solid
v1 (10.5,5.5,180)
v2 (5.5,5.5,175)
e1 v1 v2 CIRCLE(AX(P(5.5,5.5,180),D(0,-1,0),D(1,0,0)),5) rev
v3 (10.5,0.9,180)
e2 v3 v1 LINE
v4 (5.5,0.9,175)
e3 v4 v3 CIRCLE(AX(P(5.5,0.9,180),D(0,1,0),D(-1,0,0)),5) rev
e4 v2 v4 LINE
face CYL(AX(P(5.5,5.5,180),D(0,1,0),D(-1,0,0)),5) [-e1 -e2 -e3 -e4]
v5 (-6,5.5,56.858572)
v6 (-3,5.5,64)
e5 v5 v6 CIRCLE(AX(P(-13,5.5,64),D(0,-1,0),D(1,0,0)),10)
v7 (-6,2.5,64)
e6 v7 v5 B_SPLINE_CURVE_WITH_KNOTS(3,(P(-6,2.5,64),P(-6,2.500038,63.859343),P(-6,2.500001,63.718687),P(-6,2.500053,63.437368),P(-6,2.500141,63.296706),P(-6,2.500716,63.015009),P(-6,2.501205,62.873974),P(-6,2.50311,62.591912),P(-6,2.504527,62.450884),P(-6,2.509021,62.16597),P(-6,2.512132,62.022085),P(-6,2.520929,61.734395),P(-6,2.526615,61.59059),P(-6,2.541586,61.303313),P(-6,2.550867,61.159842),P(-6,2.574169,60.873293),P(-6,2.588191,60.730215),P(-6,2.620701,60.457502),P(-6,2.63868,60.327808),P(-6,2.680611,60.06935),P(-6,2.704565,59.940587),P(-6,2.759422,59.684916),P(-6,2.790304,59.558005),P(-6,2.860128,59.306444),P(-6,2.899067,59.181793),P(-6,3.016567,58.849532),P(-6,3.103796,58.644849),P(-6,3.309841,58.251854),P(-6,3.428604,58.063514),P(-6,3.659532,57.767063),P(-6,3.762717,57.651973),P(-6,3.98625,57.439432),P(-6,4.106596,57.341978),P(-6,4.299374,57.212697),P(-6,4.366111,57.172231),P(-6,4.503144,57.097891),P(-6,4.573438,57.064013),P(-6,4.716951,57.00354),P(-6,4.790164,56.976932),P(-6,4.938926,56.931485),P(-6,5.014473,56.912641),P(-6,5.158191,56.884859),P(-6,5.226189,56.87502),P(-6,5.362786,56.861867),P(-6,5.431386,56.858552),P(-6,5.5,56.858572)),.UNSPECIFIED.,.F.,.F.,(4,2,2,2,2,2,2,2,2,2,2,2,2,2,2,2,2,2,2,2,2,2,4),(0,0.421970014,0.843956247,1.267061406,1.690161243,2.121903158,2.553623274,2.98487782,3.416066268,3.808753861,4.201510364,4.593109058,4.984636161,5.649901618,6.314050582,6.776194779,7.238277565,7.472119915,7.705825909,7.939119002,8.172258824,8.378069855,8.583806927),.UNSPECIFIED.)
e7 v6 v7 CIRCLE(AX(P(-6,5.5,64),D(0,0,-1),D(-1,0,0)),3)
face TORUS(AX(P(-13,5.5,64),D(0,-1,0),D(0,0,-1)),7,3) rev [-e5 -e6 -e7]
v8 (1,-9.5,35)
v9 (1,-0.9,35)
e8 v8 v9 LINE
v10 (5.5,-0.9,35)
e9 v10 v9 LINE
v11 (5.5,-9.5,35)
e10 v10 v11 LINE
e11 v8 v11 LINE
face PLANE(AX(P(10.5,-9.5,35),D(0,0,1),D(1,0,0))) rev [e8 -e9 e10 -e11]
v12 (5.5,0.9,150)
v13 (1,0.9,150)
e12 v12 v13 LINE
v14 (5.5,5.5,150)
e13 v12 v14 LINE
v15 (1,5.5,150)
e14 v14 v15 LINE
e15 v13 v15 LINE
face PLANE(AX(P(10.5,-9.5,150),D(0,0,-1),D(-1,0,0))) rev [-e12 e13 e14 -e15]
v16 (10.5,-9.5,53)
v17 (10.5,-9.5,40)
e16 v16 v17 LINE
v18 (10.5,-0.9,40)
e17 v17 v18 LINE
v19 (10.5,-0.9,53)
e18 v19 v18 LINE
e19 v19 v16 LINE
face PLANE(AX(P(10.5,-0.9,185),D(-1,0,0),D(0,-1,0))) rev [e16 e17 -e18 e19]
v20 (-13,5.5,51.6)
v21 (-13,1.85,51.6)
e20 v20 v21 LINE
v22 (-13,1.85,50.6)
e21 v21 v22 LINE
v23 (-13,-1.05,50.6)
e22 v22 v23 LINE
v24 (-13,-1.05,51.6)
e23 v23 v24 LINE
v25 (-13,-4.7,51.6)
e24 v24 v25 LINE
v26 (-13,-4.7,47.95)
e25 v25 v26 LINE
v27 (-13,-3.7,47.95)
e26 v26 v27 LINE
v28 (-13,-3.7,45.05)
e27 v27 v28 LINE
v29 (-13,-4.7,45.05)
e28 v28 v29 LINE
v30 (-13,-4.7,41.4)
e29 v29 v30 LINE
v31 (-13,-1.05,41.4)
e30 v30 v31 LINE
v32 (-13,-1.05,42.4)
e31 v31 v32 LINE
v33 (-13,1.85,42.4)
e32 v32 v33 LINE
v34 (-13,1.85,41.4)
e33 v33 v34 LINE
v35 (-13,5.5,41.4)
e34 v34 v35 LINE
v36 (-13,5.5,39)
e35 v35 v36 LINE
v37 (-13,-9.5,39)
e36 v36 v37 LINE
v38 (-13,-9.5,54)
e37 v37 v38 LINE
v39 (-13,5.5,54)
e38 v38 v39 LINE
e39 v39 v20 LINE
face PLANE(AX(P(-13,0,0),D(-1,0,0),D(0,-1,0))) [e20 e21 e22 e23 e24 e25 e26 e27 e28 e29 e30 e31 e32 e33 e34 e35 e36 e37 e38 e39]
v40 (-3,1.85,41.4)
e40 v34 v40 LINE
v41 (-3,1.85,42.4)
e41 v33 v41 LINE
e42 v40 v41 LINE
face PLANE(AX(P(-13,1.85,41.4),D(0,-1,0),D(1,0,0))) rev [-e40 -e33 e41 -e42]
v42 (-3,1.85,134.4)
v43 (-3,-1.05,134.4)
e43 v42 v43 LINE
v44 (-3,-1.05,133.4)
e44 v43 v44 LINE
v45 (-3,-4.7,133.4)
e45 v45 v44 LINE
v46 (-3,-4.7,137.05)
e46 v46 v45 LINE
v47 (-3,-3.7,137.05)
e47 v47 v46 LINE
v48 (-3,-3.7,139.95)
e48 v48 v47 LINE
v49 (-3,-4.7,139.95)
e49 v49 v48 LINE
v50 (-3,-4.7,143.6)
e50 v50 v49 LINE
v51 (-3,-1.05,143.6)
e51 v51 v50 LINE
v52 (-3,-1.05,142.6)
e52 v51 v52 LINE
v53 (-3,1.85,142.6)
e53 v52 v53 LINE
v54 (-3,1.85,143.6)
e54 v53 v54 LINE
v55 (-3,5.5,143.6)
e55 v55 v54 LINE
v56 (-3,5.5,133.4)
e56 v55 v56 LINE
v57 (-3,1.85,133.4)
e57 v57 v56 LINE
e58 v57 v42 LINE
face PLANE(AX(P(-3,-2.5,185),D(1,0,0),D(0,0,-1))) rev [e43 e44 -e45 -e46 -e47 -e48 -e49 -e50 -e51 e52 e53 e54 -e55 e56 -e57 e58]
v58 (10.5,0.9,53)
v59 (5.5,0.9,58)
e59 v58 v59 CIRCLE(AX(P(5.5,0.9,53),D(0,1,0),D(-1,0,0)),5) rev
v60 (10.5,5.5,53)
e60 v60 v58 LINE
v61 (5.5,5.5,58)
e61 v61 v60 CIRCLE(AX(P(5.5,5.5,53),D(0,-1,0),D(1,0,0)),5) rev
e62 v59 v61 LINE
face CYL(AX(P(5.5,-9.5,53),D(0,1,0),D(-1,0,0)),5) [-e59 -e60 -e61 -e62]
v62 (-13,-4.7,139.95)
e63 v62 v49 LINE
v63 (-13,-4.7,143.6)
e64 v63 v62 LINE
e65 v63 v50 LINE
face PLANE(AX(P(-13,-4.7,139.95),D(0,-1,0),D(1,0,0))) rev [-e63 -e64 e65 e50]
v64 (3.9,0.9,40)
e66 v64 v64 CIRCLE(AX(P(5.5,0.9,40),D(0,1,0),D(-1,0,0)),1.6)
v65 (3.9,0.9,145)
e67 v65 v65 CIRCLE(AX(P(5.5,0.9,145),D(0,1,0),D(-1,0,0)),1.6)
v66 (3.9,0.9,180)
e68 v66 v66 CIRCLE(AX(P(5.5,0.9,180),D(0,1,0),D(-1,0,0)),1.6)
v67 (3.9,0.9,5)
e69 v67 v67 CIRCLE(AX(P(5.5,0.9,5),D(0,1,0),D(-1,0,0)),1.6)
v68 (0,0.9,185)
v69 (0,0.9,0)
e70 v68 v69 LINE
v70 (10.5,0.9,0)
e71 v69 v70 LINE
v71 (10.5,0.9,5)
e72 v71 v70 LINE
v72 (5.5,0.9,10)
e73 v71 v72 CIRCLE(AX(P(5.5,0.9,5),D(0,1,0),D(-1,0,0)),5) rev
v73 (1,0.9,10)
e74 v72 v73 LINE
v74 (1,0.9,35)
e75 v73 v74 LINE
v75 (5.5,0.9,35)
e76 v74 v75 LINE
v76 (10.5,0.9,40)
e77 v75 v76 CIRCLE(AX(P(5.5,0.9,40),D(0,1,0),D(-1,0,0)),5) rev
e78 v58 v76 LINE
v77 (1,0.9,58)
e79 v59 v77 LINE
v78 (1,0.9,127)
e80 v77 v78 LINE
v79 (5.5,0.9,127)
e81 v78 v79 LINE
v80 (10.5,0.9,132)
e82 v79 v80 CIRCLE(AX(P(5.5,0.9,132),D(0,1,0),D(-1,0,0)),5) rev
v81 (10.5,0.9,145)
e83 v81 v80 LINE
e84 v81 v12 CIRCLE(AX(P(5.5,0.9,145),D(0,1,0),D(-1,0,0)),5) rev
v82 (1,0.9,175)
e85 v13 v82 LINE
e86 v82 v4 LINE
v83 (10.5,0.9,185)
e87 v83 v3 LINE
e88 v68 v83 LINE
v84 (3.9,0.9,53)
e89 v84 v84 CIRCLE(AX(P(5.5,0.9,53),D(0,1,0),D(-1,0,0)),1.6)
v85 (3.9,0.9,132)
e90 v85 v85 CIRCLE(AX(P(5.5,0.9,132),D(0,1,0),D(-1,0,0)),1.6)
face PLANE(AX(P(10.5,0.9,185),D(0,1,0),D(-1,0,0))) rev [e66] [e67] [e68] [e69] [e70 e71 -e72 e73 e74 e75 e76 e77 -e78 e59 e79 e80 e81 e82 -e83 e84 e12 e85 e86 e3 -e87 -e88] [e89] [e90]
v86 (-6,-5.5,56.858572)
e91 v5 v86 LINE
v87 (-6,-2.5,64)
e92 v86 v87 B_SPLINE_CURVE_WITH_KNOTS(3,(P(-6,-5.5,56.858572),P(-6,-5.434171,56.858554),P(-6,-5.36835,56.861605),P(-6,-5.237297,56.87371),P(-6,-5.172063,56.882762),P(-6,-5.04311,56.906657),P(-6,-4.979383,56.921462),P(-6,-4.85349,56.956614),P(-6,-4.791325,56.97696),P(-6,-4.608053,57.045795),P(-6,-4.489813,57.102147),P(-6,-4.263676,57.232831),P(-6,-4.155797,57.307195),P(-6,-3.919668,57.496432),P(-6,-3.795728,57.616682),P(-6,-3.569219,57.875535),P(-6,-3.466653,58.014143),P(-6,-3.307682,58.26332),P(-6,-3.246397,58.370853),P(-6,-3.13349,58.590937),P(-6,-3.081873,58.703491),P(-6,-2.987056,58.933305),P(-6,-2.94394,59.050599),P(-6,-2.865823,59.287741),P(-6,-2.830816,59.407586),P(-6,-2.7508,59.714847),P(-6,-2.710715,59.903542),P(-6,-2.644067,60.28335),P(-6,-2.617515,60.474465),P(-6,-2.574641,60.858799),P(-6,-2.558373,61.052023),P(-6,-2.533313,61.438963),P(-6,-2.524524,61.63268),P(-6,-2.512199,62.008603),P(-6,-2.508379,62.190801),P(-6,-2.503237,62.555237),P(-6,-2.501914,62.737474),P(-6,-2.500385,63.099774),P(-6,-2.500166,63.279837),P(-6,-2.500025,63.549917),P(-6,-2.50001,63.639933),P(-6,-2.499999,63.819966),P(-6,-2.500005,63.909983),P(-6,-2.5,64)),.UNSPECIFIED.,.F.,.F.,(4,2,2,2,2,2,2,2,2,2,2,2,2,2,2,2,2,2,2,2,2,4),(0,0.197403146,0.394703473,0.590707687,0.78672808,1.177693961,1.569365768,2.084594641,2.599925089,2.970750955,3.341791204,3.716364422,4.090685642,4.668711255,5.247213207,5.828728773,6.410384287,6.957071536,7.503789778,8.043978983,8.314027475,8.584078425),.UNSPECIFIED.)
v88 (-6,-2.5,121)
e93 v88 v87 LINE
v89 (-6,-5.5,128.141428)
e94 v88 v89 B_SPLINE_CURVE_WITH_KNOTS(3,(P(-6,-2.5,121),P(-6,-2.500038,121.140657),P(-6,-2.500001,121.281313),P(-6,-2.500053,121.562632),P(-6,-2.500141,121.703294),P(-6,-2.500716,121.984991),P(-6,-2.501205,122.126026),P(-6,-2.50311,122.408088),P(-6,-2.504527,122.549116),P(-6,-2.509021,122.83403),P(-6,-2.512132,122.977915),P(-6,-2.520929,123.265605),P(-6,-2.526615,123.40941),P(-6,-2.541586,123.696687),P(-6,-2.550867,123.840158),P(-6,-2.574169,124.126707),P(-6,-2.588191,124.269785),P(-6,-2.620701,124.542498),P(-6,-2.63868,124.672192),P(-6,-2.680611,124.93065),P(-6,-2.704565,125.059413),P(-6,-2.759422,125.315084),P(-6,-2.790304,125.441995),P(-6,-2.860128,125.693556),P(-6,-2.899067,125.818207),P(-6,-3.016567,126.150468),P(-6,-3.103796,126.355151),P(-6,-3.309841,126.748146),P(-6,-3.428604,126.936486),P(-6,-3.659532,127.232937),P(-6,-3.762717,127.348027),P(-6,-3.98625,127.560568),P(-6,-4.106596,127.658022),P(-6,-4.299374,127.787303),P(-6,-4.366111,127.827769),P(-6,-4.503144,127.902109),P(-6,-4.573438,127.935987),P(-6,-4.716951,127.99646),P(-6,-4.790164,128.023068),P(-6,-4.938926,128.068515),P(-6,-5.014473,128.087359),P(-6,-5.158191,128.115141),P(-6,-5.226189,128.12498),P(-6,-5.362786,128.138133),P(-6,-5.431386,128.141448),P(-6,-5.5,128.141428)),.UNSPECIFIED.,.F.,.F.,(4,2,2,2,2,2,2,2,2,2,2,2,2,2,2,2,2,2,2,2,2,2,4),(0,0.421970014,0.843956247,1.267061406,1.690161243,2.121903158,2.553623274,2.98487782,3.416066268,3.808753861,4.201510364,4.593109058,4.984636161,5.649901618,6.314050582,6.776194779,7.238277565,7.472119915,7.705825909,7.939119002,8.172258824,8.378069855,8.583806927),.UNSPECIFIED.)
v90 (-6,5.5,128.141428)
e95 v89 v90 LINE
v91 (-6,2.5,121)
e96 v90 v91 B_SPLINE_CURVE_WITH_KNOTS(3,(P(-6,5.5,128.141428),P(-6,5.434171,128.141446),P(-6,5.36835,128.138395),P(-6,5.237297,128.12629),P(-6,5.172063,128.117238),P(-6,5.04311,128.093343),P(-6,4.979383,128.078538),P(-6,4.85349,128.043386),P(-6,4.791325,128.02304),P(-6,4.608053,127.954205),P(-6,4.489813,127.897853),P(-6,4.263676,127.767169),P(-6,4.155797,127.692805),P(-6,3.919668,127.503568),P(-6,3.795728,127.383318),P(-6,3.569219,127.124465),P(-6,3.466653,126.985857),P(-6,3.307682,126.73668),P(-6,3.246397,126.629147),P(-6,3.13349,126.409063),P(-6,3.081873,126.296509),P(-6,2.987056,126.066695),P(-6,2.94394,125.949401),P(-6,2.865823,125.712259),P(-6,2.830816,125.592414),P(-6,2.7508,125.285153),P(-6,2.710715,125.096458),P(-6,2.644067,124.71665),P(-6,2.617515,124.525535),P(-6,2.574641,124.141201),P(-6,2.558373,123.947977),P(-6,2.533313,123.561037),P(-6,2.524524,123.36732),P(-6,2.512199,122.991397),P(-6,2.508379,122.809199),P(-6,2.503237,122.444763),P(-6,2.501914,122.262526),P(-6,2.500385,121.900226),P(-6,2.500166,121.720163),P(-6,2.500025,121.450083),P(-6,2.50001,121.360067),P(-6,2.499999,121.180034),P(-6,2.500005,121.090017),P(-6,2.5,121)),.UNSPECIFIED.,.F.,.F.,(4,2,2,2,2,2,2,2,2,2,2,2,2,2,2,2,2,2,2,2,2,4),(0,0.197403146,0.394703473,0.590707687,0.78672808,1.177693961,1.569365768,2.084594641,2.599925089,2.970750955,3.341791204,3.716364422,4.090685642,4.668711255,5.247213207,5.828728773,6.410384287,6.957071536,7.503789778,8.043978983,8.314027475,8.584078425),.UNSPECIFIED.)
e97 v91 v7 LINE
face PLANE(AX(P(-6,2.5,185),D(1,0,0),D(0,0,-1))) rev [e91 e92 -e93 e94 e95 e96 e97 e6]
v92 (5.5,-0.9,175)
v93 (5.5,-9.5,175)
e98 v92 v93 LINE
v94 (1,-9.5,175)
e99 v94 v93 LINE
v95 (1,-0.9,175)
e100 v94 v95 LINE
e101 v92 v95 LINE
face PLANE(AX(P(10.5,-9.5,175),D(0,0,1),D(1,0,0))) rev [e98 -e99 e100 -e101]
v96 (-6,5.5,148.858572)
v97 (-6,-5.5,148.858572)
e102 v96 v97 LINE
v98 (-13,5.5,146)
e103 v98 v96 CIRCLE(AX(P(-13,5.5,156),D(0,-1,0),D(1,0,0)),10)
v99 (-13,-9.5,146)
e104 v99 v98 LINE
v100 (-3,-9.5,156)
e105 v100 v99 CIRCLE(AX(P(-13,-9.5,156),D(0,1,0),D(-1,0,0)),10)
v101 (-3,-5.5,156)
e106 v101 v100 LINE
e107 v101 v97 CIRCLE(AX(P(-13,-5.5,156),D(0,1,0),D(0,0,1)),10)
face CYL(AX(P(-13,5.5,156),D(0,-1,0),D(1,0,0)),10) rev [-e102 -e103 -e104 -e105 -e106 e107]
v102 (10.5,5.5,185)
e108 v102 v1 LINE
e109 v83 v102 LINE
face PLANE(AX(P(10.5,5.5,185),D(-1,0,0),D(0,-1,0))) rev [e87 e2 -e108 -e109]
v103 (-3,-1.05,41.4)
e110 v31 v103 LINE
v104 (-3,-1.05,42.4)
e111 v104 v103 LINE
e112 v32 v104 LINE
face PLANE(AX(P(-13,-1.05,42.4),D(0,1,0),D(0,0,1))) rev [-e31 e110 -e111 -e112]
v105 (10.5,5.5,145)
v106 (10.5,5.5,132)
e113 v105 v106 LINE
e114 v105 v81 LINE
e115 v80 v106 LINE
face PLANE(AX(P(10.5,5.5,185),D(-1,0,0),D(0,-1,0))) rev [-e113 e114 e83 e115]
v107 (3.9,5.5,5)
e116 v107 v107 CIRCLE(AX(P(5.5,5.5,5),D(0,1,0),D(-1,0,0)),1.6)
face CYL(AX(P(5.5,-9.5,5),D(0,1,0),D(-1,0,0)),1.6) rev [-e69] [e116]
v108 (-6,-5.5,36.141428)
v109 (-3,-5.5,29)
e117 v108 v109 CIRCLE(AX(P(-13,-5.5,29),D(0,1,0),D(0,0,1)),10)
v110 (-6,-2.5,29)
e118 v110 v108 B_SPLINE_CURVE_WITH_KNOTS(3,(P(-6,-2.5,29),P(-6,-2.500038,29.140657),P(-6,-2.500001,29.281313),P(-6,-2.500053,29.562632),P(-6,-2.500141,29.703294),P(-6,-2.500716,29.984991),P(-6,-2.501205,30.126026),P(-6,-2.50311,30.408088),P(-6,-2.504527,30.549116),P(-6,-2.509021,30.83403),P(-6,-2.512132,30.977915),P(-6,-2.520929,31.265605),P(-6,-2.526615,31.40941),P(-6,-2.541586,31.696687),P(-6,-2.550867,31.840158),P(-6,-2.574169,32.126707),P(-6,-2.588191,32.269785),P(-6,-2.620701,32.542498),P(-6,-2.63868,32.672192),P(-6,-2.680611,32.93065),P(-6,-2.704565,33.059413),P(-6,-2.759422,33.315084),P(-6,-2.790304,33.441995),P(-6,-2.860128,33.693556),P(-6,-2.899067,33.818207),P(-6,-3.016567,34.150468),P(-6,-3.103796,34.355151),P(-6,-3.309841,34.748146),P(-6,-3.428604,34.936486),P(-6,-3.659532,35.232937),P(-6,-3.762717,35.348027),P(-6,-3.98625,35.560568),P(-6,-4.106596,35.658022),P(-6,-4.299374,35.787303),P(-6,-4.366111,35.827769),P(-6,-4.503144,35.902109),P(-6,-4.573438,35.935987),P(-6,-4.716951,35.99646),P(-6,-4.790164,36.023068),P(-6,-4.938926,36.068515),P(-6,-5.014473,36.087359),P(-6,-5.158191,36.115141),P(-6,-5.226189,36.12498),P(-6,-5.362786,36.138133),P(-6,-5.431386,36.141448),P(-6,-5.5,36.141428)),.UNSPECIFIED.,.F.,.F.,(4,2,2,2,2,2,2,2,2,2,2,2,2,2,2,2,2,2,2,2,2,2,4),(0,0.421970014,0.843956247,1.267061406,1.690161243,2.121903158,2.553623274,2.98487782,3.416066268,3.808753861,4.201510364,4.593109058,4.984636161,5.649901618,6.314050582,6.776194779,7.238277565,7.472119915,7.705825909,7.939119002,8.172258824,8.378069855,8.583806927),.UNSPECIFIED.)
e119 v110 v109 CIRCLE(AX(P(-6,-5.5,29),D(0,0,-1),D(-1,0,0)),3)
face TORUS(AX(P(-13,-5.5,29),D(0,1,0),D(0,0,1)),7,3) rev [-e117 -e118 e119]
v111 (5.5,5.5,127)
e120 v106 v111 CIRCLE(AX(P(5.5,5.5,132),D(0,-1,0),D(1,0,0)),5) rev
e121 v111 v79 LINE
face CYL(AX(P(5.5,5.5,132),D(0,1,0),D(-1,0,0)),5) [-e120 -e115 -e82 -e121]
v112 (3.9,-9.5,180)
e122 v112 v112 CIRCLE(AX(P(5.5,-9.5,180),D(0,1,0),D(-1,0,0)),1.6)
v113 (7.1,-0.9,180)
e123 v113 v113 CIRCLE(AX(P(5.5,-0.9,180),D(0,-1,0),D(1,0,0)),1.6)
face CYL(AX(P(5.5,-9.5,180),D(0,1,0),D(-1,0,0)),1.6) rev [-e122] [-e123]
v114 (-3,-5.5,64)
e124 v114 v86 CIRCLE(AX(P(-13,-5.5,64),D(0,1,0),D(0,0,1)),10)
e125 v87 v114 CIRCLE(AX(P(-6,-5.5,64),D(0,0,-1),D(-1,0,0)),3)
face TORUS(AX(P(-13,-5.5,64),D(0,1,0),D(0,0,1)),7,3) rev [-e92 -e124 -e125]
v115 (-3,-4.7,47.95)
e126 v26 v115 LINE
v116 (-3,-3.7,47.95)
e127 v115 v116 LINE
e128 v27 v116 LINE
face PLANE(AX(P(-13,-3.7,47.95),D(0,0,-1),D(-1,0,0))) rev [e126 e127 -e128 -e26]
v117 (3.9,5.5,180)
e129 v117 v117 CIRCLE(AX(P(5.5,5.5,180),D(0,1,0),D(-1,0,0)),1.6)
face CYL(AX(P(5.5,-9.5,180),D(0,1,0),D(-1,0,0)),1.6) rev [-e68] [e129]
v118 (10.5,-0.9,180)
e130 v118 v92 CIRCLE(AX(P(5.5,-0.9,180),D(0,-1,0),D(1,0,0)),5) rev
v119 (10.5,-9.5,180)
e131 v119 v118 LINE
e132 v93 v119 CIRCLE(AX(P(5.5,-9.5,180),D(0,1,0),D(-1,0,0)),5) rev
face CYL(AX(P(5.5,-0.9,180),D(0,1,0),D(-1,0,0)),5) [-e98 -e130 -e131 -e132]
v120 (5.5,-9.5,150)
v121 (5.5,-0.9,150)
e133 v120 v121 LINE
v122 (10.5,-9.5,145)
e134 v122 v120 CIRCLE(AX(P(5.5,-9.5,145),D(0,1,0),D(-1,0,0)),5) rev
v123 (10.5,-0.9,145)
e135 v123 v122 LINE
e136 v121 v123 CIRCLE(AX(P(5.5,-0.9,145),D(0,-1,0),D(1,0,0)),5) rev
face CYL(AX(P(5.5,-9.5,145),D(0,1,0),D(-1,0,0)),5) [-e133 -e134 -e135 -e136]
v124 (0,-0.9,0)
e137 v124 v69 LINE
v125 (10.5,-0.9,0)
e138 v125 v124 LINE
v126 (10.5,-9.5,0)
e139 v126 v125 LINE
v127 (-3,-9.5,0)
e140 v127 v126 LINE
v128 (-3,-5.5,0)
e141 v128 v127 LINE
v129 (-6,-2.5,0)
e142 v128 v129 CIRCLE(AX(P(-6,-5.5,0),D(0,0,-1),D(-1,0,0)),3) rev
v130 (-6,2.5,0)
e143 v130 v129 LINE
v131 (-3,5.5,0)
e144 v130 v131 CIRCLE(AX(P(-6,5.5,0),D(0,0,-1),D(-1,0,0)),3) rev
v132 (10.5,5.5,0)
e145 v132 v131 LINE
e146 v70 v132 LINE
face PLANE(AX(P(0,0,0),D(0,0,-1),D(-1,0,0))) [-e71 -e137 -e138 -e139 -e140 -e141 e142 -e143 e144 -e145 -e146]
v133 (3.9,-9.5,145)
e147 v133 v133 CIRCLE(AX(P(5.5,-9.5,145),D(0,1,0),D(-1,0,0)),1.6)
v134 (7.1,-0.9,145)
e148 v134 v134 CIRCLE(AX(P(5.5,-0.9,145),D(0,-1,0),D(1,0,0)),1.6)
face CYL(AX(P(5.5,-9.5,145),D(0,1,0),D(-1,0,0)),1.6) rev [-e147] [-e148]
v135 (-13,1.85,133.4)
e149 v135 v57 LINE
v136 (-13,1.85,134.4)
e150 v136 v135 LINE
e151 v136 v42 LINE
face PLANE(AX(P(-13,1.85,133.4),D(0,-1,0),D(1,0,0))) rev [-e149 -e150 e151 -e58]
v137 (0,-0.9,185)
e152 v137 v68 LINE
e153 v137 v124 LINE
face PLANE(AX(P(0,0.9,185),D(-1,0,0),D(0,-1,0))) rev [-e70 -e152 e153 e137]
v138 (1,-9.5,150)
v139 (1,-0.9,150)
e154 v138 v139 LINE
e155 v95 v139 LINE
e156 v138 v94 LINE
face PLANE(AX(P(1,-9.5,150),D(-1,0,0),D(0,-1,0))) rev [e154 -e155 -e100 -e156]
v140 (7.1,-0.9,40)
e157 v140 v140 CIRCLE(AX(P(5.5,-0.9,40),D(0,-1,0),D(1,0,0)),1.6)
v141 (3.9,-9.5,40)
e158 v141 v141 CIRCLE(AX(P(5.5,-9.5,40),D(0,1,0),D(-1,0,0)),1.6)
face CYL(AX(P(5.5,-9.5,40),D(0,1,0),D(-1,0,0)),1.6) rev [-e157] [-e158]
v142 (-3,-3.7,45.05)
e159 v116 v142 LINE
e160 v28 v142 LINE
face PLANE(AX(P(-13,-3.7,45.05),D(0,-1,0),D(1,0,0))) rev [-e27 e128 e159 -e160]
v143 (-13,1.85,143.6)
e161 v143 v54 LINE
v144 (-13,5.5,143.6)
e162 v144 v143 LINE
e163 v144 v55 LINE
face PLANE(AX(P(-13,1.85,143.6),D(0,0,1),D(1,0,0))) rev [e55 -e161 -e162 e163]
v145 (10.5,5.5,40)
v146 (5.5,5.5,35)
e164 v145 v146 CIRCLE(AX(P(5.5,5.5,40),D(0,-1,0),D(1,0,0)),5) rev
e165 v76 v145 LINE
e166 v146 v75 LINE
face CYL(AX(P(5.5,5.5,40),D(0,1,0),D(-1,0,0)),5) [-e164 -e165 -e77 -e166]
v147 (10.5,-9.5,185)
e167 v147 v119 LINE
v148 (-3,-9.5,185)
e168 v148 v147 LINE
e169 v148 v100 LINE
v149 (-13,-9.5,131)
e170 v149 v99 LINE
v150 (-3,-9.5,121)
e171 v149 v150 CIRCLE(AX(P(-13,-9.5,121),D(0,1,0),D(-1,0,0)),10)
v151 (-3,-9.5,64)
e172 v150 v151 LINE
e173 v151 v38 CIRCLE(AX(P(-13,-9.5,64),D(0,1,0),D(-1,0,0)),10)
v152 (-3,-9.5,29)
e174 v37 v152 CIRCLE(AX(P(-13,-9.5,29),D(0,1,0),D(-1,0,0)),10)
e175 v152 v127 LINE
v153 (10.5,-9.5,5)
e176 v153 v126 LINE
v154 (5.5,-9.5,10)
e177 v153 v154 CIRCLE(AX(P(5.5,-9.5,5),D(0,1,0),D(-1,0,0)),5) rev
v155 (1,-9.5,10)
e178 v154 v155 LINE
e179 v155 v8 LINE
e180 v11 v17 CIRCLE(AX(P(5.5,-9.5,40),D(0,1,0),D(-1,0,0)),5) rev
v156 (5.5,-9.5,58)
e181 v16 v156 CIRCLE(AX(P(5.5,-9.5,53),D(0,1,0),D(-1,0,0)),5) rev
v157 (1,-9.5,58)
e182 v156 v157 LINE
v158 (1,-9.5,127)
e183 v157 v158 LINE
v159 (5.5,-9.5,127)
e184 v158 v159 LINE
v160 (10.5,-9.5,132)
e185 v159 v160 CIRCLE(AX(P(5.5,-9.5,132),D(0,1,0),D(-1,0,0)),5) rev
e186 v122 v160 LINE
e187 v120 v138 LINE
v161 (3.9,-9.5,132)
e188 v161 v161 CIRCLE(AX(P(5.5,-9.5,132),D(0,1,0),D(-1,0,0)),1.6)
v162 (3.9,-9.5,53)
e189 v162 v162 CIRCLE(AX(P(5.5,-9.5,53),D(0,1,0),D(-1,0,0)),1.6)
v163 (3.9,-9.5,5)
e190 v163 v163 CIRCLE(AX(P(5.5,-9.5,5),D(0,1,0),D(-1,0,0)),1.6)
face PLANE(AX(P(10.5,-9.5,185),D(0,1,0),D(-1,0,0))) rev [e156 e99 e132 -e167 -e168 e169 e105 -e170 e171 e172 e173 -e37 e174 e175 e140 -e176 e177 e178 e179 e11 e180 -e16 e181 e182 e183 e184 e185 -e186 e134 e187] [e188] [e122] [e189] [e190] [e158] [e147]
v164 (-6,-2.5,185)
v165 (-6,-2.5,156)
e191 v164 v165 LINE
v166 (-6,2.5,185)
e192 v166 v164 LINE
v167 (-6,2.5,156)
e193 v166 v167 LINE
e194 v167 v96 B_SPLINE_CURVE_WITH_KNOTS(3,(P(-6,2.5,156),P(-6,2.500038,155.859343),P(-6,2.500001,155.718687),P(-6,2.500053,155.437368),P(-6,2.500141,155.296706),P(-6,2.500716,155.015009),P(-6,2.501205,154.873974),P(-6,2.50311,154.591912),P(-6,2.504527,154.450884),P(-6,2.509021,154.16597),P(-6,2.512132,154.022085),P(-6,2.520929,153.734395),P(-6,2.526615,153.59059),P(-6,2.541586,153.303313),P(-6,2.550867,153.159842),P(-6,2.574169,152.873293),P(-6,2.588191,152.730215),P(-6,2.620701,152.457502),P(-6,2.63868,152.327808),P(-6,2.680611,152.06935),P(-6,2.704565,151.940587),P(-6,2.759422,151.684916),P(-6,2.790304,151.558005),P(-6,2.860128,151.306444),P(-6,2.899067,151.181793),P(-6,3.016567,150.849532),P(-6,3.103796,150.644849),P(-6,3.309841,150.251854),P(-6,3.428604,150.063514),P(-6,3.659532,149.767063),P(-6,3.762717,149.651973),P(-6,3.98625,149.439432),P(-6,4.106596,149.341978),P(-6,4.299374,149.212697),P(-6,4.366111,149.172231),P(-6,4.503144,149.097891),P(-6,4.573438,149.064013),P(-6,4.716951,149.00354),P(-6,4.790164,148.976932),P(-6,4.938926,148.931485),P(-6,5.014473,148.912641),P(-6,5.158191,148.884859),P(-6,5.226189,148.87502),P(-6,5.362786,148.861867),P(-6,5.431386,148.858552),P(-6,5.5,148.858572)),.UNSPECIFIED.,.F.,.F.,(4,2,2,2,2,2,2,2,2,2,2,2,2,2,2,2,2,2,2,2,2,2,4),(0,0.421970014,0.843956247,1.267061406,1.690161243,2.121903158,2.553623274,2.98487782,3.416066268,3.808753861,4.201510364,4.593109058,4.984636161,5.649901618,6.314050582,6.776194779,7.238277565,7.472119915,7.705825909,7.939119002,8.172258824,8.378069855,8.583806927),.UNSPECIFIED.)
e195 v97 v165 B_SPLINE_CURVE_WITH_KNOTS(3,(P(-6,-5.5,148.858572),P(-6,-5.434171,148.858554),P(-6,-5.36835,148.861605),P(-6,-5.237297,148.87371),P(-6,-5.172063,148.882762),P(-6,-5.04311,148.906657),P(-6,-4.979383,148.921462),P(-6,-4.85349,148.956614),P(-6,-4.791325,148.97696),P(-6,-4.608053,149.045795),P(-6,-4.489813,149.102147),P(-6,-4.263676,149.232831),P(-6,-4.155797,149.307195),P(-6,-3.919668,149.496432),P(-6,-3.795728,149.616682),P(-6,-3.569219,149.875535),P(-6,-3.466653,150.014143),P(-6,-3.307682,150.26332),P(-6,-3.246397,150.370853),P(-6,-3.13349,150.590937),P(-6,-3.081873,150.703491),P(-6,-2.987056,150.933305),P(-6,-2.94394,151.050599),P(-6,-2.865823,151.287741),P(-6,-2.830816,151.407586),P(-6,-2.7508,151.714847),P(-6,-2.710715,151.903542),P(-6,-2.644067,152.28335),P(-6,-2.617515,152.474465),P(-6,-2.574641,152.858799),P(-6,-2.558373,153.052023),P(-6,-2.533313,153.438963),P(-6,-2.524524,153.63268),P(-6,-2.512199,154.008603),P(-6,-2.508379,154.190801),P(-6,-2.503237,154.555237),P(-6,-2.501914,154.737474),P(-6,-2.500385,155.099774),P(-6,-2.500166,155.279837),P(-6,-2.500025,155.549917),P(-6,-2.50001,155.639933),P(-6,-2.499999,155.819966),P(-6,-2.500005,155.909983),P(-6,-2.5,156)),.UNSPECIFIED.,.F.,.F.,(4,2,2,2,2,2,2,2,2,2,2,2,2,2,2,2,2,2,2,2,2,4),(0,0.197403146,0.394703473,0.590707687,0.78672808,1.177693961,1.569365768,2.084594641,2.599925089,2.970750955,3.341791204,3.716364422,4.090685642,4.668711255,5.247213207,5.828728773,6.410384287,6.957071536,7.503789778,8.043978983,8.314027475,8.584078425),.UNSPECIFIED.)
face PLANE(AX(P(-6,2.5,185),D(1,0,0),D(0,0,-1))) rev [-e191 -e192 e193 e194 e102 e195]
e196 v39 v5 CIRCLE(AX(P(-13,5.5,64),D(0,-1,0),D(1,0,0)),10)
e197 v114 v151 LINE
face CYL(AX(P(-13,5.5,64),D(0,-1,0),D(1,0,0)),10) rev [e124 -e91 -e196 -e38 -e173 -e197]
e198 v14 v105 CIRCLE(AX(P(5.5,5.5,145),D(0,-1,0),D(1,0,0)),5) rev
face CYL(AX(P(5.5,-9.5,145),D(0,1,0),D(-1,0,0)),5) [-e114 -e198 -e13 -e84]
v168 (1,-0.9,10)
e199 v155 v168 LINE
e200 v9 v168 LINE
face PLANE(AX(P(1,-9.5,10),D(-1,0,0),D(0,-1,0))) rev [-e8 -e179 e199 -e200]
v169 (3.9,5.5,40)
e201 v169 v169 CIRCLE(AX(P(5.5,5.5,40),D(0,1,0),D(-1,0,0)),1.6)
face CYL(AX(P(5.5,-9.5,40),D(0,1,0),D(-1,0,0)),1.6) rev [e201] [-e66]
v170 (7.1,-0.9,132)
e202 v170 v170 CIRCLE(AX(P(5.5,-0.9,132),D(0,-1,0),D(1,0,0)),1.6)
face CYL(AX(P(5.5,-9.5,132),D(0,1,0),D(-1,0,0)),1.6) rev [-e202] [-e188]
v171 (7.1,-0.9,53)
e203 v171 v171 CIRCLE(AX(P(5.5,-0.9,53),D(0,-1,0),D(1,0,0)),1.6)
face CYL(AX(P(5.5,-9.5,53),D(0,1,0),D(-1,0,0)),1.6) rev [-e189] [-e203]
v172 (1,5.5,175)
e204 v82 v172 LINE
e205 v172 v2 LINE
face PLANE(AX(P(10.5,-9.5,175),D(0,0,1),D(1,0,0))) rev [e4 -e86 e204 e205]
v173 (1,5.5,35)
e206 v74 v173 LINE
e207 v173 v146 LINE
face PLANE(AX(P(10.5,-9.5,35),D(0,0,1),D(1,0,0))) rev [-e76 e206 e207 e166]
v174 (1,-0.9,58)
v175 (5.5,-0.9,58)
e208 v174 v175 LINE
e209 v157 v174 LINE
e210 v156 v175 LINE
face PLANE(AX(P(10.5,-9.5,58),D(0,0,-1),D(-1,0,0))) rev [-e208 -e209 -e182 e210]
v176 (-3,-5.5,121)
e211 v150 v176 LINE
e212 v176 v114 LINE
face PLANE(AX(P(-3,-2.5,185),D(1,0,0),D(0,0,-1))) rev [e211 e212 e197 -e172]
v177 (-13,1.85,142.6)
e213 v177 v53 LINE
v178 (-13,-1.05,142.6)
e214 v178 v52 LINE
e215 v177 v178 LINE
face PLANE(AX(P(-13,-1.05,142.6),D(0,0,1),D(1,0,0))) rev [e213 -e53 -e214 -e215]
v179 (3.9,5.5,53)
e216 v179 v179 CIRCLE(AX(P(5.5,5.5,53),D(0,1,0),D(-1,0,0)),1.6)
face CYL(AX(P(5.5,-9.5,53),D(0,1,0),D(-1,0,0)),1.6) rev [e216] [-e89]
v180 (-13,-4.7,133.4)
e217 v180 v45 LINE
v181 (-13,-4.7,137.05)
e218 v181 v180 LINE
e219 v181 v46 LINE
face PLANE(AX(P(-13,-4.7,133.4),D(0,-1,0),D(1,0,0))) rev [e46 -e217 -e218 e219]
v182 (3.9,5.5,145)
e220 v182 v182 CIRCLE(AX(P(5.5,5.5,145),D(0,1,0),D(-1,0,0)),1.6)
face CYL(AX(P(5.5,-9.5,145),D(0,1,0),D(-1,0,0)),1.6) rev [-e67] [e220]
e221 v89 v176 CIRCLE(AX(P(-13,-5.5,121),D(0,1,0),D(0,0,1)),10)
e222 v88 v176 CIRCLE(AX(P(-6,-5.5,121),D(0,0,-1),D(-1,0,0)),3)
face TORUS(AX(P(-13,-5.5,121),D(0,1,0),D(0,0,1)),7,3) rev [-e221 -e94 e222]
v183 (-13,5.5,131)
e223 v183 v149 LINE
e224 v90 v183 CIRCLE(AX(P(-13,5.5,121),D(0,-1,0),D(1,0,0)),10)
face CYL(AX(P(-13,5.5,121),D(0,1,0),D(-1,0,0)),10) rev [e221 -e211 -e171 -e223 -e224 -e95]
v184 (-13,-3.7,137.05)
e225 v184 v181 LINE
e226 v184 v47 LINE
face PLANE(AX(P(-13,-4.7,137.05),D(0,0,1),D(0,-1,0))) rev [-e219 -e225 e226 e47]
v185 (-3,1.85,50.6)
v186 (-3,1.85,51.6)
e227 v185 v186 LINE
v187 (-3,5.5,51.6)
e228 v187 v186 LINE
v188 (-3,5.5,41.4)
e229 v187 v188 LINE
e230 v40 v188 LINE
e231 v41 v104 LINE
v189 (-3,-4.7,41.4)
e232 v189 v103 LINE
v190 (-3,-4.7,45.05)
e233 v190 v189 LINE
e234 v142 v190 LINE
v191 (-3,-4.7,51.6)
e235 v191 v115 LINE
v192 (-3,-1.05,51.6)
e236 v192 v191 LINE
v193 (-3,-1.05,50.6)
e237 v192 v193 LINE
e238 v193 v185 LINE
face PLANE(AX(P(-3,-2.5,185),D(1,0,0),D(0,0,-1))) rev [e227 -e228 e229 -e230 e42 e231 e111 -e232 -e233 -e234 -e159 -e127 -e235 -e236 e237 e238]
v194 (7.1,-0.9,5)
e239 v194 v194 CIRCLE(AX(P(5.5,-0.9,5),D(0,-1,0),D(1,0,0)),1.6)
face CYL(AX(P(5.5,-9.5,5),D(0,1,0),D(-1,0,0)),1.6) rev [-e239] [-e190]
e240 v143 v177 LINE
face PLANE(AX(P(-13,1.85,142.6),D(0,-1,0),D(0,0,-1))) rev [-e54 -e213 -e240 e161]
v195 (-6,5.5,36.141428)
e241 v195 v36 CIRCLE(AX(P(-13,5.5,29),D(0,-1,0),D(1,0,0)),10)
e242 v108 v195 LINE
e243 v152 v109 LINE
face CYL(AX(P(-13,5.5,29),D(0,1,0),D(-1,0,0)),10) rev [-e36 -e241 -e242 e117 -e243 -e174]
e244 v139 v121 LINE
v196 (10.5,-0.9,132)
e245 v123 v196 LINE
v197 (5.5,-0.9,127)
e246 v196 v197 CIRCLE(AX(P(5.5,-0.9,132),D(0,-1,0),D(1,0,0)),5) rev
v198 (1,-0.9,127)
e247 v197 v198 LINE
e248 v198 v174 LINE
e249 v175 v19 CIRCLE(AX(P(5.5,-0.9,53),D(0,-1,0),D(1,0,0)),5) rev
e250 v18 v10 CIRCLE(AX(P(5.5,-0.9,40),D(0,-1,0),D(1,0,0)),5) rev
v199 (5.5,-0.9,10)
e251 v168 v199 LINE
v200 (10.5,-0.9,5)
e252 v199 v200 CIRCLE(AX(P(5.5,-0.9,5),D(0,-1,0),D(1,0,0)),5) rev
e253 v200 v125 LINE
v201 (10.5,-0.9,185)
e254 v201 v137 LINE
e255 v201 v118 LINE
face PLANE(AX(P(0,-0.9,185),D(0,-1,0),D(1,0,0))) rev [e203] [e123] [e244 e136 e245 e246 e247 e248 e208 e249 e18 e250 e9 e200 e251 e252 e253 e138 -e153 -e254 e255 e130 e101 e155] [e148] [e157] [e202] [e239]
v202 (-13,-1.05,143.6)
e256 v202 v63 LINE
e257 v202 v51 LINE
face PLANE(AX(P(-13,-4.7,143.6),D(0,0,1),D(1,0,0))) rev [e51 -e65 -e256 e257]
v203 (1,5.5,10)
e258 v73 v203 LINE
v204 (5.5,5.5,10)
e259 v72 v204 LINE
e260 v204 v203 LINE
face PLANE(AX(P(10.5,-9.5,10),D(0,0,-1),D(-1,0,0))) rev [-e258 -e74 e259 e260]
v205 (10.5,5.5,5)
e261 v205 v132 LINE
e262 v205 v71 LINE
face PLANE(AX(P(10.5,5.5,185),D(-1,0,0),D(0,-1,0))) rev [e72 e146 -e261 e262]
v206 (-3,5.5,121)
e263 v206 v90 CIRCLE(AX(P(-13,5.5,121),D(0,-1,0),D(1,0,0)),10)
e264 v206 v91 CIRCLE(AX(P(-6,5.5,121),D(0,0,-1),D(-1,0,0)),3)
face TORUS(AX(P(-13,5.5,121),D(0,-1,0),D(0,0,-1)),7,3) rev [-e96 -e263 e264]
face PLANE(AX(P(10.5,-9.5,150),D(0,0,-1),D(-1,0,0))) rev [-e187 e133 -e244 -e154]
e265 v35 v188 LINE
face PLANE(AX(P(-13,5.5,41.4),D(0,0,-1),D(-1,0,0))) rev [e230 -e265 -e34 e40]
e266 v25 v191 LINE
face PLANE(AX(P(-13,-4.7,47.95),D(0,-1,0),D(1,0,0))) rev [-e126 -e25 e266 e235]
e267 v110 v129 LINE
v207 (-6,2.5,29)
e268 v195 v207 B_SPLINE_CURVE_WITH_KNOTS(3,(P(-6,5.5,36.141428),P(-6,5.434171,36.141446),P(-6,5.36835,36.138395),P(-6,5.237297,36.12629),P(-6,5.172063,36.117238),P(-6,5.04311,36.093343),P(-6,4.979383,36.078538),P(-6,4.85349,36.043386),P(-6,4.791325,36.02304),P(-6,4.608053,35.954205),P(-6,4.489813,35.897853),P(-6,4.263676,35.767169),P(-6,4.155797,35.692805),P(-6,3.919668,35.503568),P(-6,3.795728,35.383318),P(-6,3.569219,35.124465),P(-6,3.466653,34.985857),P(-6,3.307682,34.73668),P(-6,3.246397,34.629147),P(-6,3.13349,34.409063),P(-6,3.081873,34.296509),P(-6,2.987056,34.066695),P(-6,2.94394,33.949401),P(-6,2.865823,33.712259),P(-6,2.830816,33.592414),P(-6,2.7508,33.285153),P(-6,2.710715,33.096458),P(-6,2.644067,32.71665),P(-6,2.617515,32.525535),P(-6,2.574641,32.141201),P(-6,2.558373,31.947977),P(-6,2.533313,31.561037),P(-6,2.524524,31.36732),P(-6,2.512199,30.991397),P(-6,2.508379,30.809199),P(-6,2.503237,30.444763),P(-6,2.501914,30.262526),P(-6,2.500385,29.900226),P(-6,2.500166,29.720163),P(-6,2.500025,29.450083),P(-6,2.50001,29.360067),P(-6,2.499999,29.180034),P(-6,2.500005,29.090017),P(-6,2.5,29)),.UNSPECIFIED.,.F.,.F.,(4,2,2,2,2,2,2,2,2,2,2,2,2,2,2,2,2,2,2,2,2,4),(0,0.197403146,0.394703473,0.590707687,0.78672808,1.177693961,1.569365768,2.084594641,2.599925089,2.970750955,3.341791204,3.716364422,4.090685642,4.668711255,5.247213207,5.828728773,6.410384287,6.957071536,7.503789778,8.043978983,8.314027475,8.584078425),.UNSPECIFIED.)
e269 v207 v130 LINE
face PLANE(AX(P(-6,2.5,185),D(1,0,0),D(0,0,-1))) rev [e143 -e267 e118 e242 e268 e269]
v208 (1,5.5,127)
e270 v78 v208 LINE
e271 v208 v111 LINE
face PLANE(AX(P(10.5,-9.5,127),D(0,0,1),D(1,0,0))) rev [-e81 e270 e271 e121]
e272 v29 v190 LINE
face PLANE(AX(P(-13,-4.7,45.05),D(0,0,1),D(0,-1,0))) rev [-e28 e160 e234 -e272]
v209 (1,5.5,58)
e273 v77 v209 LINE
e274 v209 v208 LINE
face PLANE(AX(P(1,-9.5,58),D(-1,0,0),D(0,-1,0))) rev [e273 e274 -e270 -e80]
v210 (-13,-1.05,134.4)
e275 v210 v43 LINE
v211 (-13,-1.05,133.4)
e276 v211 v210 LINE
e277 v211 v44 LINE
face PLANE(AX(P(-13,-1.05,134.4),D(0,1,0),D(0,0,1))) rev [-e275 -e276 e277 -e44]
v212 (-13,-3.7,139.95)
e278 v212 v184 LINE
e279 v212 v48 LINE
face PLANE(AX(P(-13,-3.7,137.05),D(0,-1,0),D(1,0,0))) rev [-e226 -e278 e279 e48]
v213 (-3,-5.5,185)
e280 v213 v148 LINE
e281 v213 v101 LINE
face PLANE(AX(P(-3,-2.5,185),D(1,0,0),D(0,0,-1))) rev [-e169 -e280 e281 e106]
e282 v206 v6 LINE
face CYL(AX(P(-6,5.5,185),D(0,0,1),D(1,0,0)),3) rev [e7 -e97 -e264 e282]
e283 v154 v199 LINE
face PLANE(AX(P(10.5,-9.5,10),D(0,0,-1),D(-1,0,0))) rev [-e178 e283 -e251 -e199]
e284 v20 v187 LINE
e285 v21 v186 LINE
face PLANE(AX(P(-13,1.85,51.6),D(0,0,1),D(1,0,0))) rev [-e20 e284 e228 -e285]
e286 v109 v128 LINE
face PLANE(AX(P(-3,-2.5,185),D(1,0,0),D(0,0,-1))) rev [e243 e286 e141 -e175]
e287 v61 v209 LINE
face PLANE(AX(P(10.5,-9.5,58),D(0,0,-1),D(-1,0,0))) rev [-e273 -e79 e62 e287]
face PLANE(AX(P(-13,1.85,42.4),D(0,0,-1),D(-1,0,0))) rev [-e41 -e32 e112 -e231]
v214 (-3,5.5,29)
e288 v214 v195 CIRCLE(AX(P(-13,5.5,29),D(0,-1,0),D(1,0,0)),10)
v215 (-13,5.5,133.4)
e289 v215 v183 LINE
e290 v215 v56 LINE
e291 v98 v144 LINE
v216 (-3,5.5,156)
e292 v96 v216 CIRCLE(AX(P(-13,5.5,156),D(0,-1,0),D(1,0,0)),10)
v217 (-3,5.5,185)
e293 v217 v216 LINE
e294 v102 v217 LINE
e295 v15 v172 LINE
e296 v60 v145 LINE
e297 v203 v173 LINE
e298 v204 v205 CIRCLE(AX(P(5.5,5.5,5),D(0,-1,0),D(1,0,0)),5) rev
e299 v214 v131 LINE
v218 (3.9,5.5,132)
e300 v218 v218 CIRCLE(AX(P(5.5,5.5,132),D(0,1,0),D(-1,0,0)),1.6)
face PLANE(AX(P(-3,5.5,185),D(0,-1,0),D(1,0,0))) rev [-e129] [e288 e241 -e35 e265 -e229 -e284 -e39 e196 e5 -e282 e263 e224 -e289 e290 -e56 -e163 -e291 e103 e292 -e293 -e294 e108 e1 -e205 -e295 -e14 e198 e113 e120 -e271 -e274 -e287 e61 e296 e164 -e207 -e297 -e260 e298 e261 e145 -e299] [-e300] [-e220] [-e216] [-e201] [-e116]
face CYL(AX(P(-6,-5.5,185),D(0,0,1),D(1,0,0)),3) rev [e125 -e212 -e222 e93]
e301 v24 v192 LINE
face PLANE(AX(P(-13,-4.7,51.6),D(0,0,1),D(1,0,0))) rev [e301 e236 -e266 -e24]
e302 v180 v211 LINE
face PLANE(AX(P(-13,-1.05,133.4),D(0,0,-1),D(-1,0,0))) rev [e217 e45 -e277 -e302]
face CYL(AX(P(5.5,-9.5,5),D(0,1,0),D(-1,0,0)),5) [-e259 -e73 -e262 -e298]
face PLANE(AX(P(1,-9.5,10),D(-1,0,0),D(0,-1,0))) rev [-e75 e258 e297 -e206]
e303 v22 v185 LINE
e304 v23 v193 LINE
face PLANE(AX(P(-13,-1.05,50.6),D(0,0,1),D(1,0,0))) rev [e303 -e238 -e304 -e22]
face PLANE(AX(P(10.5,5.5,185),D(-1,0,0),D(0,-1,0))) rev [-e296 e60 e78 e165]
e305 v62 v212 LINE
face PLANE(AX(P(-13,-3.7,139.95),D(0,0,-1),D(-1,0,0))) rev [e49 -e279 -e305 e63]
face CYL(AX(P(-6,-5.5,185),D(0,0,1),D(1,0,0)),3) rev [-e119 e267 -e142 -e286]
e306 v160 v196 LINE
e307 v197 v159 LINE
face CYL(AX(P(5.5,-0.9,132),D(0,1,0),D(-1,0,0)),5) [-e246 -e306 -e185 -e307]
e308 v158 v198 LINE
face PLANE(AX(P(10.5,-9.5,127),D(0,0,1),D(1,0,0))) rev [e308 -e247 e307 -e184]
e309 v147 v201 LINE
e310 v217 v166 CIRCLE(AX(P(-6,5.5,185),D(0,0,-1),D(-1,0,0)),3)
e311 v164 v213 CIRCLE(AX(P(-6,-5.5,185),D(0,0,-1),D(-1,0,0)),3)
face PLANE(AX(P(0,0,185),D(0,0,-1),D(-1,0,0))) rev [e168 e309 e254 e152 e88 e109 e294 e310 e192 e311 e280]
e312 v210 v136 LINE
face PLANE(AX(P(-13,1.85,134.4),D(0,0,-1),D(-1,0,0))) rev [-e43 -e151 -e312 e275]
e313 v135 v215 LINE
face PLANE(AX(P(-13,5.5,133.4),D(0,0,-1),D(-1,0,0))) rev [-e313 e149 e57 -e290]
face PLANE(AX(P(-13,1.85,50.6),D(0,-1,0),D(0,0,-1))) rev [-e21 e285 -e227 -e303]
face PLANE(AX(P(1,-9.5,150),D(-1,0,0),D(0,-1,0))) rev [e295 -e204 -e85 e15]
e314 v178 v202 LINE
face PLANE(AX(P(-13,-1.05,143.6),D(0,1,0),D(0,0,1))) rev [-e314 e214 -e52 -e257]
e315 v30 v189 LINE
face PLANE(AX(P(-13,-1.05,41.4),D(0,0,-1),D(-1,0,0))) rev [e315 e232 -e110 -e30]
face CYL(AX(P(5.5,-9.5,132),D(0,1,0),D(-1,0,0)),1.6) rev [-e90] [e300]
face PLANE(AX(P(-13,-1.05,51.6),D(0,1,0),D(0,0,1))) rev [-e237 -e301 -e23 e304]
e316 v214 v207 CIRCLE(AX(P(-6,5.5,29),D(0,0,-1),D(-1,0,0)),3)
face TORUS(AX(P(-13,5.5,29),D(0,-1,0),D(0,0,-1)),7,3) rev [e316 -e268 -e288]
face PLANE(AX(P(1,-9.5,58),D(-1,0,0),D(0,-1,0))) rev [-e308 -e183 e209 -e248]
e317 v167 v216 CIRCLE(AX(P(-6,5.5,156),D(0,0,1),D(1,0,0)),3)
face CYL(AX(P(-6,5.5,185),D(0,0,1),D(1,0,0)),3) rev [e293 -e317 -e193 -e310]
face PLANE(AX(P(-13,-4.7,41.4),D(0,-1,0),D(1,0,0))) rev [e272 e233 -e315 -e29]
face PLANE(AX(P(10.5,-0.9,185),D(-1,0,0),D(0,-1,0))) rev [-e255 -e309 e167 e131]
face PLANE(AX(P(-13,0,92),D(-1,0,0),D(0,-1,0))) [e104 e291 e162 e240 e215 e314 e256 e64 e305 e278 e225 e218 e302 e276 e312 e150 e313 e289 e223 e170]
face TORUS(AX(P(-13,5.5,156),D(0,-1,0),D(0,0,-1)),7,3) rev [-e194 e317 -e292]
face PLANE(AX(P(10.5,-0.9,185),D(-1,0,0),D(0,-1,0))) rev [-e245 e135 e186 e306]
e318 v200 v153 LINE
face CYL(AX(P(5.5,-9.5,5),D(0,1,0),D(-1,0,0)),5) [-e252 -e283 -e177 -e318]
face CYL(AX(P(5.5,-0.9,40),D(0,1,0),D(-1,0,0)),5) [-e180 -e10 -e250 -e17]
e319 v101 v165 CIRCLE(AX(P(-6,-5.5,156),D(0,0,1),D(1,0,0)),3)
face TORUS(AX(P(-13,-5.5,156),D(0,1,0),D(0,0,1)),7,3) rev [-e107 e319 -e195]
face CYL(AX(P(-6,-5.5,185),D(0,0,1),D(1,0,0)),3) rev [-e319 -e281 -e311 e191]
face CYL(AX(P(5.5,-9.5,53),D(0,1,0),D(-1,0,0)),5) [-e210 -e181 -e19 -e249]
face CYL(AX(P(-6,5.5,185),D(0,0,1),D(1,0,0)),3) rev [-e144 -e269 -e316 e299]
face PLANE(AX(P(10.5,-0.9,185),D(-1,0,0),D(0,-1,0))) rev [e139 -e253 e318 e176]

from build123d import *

# Parameters (mm, degrees)
MAIN_DEPTH                       = 185
ESQUISSE3_R                      = 1.6
HOLES_DEPTH                      = 186.90387301
FIXING_DEPTH                     = 10
FIXINGHOLE_DEPTH                 = 186.735026314
CONG_2_R                         = 10
ESQUISSE5_W                      = 9.5
ESQUISSE5_H                      = 25
ESQUISSE5_H_2                    = 69
ENL_V_MAT_EXTRU_3_DEPTH          = 187.061817684
R_P_TITION_LIN_AIRE2_COUNT       = 2
R_P_TITION_LIN_AIRE2_PITCH       = 92
CONG_2_OF_R_P_TITION_LIN_AIRE2_R = 10
CONG_4_R                         = 3
CONG_5_R                         = 5


with BuildPart() as part:
    # Esquisse2 → Main (new body)
    with BuildSketch(Plane.XY):
        Polygon((10.5, 0.9), (0, 0.9), (0, -0.9), (10.5, -0.9), (10.5, -9.5), (-3, -9.5), (-3, -2.5), (-6, -2.5), (-6, 2.5), (-3, 2.5), (-3, 5.5), (10.5, 5.5), align=None)
    extrude(amount=MAIN_DEPTH)

    # Esquisse3 → Holes (cut, through all)
    with BuildSketch(Plane(origin=(0, 5.5, 0), x_dir=(1, 0, 0), z_dir=(0, 1, 0))):
        with Locations(Location((5.5, -5, 0), (0, 0, 180))):
            Circle(ESQUISSE3_R)
        with Locations(Location((5.5, -40, 0), (0, 0, 180))):
            Circle(ESQUISSE3_R)
        with Locations(Location((5.5, -53, 0), (0, 0, 180))):
            Circle(ESQUISSE3_R)
        with Locations(Location((5.5, -145, 0), (0, 0, 180))):
            Circle(ESQUISSE3_R)
        with Locations(Location((5.5, -180, 0), (0, 0, 180))):
            Circle(ESQUISSE3_R)
        with Locations(Location((5.5, -132, 0), (0, 0, 180))):
            Circle(ESQUISSE3_R)
    extrude(amount=-HOLES_DEPTH, mode=Mode.SUBTRACT)

    # Esquisse4 → Fixing (add)
    with BuildSketch(Plane.ZY.offset(3)):
        Polygon((41.4, 5.5), (41.4, 1.85), (42.4, 1.85), (42.4, -1.05), (41.4, -1.05), (41.4, -4.7), (45.05, -4.7), (45.05, -3.7), (47.95, -3.7), (47.95, -4.7), (51.6, -4.7), (51.6, -1.05), (50.6, -1.05), (50.6, 1.85), (51.6, 1.85), (51.6, 5.5), (54, 5.5), (54, -9.5), (39, -9.5), (39, 5.5), align=None)
    fixing = extrude(amount=FIXING_DEPTH)

    # Esquisse6 → FixingHole (cut, through all)
    with BuildSketch(Plane.ZY.offset(3)):
        Polygon((41.4, 2.5), (51.6, 2.5), (51.6, 1.85), (50.6, 1.85), (50.6, -1.05), (51.6, -1.05), (51.6, -2.5), (41.4, -2.5), (41.4, -1.05), (42.4, -1.05), (42.4, 1.85), (41.4, 1.85), align=None)
    fixinghole = extrude(amount=FIXINGHOLE_DEPTH, mode=Mode.SUBTRACT)

    # Congé2
    cong_2_edges = [part.edges().sort_by_distance(p)[0] for p in [
        (-3, 4, 54),
        (-3, 4, 39),
    ]]
    fillet(cong_2_edges, radius=CONG_2_R - 0.0001)  # a hair under: the kernel refuses the full size

    # Esquisse5 → Enlèv. mat.-Extru.3 (cut, through all)
    with BuildSketch(Plane(origin=(0, 5.5, 0), x_dir=(1, 0, 0), z_dir=(0, 1, 0))):
        with Locations((5.75, -22.5)):
            Rectangle(ESQUISSE5_W, ESQUISSE5_H)
        with Locations((5.75, -92.5)):
            Rectangle(ESQUISSE5_W, ESQUISSE5_H_2)
        with Locations((5.75, -162.5)):
            Rectangle(ESQUISSE5_W, ESQUISSE5_H)
    extrude(amount=-ENL_V_MAT_EXTRU_3_DEPTH, mode=Mode.SUBTRACT)

    # Répétition linéaire2: Fixing, FixingHole ×2
    with Locations(*[(0, 0, i * R_P_TITION_LIN_AIRE2_PITCH) for i in range(1, R_P_TITION_LIN_AIRE2_COUNT)]):
        add(fixing)
        add(fixinghole, mode=Mode.SUBTRACT)

    # Congé2 of Répétition linéaire2
    cong_2_of_r_p_tition_lin_aire2_edges = [part.edges().sort_by_distance(p)[0] for p in [
        (-3, 4, 146),
        (-3, 4, 131),
    ]]
    fillet(cong_2_of_r_p_tition_lin_aire2_edges, radius=CONG_2_OF_R_P_TITION_LIN_AIRE2_R - 0.0001)  # a hair under: the kernel refuses the full size

    # Congé4
    cong_4_edges = [part.edges().sort_by_distance(p)[0] for p in [
        (-3, 2.5, 14.50005),
        (-3, -2.5, 170.49995),
        (-3, -2.5, 92.5),
        (-3, -2.5, 14.50005),
        (-3, 2.5, 170.49995),
        (-3, 2.5, 92.5),
        (-3.780455873, 2.5, 152.126936019),
        (-3.780455873, 2.5, 124.873063981),
        (-3.780455873, 2.5, 60.126936019),
        (-3.780455873, -2.5, 152.126936019),
        (-3.780455873, -2.5, 124.873063981),
        (-3.780455873, -2.5, 60.126936019),
        (-3.780455873, -2.5, 32.873063981),
        (-3.780455873, 2.5, 32.873063981),
    ]]
    fillet(cong_4_edges, radius=CONG_4_R - 0.0001)  # a hair under: the kernel refuses the full size

    # Congé5
    cong_5_edges = [part.edges().sort_by_distance(p)[0] for p in [
        (10.5, -5.2, 10),
        (10.5, 3.2, 10),
        (10.5, -5.2, 35),
        (10.5, 3.2, 35),
        (10.5, -5.2, 58),
        (10.5, 3.2, 58),
        (10.5, -5.2, 127),
        (10.5, 3.2, 127),
        (10.5, -5.2, 150),
        (10.5, 3.2, 150),
        (10.5, -5.2, 175),
        (10.5, 3.2, 175),
    ]]
    fillet(cong_5_edges, radius=CONG_5_R)


solid = part.part
